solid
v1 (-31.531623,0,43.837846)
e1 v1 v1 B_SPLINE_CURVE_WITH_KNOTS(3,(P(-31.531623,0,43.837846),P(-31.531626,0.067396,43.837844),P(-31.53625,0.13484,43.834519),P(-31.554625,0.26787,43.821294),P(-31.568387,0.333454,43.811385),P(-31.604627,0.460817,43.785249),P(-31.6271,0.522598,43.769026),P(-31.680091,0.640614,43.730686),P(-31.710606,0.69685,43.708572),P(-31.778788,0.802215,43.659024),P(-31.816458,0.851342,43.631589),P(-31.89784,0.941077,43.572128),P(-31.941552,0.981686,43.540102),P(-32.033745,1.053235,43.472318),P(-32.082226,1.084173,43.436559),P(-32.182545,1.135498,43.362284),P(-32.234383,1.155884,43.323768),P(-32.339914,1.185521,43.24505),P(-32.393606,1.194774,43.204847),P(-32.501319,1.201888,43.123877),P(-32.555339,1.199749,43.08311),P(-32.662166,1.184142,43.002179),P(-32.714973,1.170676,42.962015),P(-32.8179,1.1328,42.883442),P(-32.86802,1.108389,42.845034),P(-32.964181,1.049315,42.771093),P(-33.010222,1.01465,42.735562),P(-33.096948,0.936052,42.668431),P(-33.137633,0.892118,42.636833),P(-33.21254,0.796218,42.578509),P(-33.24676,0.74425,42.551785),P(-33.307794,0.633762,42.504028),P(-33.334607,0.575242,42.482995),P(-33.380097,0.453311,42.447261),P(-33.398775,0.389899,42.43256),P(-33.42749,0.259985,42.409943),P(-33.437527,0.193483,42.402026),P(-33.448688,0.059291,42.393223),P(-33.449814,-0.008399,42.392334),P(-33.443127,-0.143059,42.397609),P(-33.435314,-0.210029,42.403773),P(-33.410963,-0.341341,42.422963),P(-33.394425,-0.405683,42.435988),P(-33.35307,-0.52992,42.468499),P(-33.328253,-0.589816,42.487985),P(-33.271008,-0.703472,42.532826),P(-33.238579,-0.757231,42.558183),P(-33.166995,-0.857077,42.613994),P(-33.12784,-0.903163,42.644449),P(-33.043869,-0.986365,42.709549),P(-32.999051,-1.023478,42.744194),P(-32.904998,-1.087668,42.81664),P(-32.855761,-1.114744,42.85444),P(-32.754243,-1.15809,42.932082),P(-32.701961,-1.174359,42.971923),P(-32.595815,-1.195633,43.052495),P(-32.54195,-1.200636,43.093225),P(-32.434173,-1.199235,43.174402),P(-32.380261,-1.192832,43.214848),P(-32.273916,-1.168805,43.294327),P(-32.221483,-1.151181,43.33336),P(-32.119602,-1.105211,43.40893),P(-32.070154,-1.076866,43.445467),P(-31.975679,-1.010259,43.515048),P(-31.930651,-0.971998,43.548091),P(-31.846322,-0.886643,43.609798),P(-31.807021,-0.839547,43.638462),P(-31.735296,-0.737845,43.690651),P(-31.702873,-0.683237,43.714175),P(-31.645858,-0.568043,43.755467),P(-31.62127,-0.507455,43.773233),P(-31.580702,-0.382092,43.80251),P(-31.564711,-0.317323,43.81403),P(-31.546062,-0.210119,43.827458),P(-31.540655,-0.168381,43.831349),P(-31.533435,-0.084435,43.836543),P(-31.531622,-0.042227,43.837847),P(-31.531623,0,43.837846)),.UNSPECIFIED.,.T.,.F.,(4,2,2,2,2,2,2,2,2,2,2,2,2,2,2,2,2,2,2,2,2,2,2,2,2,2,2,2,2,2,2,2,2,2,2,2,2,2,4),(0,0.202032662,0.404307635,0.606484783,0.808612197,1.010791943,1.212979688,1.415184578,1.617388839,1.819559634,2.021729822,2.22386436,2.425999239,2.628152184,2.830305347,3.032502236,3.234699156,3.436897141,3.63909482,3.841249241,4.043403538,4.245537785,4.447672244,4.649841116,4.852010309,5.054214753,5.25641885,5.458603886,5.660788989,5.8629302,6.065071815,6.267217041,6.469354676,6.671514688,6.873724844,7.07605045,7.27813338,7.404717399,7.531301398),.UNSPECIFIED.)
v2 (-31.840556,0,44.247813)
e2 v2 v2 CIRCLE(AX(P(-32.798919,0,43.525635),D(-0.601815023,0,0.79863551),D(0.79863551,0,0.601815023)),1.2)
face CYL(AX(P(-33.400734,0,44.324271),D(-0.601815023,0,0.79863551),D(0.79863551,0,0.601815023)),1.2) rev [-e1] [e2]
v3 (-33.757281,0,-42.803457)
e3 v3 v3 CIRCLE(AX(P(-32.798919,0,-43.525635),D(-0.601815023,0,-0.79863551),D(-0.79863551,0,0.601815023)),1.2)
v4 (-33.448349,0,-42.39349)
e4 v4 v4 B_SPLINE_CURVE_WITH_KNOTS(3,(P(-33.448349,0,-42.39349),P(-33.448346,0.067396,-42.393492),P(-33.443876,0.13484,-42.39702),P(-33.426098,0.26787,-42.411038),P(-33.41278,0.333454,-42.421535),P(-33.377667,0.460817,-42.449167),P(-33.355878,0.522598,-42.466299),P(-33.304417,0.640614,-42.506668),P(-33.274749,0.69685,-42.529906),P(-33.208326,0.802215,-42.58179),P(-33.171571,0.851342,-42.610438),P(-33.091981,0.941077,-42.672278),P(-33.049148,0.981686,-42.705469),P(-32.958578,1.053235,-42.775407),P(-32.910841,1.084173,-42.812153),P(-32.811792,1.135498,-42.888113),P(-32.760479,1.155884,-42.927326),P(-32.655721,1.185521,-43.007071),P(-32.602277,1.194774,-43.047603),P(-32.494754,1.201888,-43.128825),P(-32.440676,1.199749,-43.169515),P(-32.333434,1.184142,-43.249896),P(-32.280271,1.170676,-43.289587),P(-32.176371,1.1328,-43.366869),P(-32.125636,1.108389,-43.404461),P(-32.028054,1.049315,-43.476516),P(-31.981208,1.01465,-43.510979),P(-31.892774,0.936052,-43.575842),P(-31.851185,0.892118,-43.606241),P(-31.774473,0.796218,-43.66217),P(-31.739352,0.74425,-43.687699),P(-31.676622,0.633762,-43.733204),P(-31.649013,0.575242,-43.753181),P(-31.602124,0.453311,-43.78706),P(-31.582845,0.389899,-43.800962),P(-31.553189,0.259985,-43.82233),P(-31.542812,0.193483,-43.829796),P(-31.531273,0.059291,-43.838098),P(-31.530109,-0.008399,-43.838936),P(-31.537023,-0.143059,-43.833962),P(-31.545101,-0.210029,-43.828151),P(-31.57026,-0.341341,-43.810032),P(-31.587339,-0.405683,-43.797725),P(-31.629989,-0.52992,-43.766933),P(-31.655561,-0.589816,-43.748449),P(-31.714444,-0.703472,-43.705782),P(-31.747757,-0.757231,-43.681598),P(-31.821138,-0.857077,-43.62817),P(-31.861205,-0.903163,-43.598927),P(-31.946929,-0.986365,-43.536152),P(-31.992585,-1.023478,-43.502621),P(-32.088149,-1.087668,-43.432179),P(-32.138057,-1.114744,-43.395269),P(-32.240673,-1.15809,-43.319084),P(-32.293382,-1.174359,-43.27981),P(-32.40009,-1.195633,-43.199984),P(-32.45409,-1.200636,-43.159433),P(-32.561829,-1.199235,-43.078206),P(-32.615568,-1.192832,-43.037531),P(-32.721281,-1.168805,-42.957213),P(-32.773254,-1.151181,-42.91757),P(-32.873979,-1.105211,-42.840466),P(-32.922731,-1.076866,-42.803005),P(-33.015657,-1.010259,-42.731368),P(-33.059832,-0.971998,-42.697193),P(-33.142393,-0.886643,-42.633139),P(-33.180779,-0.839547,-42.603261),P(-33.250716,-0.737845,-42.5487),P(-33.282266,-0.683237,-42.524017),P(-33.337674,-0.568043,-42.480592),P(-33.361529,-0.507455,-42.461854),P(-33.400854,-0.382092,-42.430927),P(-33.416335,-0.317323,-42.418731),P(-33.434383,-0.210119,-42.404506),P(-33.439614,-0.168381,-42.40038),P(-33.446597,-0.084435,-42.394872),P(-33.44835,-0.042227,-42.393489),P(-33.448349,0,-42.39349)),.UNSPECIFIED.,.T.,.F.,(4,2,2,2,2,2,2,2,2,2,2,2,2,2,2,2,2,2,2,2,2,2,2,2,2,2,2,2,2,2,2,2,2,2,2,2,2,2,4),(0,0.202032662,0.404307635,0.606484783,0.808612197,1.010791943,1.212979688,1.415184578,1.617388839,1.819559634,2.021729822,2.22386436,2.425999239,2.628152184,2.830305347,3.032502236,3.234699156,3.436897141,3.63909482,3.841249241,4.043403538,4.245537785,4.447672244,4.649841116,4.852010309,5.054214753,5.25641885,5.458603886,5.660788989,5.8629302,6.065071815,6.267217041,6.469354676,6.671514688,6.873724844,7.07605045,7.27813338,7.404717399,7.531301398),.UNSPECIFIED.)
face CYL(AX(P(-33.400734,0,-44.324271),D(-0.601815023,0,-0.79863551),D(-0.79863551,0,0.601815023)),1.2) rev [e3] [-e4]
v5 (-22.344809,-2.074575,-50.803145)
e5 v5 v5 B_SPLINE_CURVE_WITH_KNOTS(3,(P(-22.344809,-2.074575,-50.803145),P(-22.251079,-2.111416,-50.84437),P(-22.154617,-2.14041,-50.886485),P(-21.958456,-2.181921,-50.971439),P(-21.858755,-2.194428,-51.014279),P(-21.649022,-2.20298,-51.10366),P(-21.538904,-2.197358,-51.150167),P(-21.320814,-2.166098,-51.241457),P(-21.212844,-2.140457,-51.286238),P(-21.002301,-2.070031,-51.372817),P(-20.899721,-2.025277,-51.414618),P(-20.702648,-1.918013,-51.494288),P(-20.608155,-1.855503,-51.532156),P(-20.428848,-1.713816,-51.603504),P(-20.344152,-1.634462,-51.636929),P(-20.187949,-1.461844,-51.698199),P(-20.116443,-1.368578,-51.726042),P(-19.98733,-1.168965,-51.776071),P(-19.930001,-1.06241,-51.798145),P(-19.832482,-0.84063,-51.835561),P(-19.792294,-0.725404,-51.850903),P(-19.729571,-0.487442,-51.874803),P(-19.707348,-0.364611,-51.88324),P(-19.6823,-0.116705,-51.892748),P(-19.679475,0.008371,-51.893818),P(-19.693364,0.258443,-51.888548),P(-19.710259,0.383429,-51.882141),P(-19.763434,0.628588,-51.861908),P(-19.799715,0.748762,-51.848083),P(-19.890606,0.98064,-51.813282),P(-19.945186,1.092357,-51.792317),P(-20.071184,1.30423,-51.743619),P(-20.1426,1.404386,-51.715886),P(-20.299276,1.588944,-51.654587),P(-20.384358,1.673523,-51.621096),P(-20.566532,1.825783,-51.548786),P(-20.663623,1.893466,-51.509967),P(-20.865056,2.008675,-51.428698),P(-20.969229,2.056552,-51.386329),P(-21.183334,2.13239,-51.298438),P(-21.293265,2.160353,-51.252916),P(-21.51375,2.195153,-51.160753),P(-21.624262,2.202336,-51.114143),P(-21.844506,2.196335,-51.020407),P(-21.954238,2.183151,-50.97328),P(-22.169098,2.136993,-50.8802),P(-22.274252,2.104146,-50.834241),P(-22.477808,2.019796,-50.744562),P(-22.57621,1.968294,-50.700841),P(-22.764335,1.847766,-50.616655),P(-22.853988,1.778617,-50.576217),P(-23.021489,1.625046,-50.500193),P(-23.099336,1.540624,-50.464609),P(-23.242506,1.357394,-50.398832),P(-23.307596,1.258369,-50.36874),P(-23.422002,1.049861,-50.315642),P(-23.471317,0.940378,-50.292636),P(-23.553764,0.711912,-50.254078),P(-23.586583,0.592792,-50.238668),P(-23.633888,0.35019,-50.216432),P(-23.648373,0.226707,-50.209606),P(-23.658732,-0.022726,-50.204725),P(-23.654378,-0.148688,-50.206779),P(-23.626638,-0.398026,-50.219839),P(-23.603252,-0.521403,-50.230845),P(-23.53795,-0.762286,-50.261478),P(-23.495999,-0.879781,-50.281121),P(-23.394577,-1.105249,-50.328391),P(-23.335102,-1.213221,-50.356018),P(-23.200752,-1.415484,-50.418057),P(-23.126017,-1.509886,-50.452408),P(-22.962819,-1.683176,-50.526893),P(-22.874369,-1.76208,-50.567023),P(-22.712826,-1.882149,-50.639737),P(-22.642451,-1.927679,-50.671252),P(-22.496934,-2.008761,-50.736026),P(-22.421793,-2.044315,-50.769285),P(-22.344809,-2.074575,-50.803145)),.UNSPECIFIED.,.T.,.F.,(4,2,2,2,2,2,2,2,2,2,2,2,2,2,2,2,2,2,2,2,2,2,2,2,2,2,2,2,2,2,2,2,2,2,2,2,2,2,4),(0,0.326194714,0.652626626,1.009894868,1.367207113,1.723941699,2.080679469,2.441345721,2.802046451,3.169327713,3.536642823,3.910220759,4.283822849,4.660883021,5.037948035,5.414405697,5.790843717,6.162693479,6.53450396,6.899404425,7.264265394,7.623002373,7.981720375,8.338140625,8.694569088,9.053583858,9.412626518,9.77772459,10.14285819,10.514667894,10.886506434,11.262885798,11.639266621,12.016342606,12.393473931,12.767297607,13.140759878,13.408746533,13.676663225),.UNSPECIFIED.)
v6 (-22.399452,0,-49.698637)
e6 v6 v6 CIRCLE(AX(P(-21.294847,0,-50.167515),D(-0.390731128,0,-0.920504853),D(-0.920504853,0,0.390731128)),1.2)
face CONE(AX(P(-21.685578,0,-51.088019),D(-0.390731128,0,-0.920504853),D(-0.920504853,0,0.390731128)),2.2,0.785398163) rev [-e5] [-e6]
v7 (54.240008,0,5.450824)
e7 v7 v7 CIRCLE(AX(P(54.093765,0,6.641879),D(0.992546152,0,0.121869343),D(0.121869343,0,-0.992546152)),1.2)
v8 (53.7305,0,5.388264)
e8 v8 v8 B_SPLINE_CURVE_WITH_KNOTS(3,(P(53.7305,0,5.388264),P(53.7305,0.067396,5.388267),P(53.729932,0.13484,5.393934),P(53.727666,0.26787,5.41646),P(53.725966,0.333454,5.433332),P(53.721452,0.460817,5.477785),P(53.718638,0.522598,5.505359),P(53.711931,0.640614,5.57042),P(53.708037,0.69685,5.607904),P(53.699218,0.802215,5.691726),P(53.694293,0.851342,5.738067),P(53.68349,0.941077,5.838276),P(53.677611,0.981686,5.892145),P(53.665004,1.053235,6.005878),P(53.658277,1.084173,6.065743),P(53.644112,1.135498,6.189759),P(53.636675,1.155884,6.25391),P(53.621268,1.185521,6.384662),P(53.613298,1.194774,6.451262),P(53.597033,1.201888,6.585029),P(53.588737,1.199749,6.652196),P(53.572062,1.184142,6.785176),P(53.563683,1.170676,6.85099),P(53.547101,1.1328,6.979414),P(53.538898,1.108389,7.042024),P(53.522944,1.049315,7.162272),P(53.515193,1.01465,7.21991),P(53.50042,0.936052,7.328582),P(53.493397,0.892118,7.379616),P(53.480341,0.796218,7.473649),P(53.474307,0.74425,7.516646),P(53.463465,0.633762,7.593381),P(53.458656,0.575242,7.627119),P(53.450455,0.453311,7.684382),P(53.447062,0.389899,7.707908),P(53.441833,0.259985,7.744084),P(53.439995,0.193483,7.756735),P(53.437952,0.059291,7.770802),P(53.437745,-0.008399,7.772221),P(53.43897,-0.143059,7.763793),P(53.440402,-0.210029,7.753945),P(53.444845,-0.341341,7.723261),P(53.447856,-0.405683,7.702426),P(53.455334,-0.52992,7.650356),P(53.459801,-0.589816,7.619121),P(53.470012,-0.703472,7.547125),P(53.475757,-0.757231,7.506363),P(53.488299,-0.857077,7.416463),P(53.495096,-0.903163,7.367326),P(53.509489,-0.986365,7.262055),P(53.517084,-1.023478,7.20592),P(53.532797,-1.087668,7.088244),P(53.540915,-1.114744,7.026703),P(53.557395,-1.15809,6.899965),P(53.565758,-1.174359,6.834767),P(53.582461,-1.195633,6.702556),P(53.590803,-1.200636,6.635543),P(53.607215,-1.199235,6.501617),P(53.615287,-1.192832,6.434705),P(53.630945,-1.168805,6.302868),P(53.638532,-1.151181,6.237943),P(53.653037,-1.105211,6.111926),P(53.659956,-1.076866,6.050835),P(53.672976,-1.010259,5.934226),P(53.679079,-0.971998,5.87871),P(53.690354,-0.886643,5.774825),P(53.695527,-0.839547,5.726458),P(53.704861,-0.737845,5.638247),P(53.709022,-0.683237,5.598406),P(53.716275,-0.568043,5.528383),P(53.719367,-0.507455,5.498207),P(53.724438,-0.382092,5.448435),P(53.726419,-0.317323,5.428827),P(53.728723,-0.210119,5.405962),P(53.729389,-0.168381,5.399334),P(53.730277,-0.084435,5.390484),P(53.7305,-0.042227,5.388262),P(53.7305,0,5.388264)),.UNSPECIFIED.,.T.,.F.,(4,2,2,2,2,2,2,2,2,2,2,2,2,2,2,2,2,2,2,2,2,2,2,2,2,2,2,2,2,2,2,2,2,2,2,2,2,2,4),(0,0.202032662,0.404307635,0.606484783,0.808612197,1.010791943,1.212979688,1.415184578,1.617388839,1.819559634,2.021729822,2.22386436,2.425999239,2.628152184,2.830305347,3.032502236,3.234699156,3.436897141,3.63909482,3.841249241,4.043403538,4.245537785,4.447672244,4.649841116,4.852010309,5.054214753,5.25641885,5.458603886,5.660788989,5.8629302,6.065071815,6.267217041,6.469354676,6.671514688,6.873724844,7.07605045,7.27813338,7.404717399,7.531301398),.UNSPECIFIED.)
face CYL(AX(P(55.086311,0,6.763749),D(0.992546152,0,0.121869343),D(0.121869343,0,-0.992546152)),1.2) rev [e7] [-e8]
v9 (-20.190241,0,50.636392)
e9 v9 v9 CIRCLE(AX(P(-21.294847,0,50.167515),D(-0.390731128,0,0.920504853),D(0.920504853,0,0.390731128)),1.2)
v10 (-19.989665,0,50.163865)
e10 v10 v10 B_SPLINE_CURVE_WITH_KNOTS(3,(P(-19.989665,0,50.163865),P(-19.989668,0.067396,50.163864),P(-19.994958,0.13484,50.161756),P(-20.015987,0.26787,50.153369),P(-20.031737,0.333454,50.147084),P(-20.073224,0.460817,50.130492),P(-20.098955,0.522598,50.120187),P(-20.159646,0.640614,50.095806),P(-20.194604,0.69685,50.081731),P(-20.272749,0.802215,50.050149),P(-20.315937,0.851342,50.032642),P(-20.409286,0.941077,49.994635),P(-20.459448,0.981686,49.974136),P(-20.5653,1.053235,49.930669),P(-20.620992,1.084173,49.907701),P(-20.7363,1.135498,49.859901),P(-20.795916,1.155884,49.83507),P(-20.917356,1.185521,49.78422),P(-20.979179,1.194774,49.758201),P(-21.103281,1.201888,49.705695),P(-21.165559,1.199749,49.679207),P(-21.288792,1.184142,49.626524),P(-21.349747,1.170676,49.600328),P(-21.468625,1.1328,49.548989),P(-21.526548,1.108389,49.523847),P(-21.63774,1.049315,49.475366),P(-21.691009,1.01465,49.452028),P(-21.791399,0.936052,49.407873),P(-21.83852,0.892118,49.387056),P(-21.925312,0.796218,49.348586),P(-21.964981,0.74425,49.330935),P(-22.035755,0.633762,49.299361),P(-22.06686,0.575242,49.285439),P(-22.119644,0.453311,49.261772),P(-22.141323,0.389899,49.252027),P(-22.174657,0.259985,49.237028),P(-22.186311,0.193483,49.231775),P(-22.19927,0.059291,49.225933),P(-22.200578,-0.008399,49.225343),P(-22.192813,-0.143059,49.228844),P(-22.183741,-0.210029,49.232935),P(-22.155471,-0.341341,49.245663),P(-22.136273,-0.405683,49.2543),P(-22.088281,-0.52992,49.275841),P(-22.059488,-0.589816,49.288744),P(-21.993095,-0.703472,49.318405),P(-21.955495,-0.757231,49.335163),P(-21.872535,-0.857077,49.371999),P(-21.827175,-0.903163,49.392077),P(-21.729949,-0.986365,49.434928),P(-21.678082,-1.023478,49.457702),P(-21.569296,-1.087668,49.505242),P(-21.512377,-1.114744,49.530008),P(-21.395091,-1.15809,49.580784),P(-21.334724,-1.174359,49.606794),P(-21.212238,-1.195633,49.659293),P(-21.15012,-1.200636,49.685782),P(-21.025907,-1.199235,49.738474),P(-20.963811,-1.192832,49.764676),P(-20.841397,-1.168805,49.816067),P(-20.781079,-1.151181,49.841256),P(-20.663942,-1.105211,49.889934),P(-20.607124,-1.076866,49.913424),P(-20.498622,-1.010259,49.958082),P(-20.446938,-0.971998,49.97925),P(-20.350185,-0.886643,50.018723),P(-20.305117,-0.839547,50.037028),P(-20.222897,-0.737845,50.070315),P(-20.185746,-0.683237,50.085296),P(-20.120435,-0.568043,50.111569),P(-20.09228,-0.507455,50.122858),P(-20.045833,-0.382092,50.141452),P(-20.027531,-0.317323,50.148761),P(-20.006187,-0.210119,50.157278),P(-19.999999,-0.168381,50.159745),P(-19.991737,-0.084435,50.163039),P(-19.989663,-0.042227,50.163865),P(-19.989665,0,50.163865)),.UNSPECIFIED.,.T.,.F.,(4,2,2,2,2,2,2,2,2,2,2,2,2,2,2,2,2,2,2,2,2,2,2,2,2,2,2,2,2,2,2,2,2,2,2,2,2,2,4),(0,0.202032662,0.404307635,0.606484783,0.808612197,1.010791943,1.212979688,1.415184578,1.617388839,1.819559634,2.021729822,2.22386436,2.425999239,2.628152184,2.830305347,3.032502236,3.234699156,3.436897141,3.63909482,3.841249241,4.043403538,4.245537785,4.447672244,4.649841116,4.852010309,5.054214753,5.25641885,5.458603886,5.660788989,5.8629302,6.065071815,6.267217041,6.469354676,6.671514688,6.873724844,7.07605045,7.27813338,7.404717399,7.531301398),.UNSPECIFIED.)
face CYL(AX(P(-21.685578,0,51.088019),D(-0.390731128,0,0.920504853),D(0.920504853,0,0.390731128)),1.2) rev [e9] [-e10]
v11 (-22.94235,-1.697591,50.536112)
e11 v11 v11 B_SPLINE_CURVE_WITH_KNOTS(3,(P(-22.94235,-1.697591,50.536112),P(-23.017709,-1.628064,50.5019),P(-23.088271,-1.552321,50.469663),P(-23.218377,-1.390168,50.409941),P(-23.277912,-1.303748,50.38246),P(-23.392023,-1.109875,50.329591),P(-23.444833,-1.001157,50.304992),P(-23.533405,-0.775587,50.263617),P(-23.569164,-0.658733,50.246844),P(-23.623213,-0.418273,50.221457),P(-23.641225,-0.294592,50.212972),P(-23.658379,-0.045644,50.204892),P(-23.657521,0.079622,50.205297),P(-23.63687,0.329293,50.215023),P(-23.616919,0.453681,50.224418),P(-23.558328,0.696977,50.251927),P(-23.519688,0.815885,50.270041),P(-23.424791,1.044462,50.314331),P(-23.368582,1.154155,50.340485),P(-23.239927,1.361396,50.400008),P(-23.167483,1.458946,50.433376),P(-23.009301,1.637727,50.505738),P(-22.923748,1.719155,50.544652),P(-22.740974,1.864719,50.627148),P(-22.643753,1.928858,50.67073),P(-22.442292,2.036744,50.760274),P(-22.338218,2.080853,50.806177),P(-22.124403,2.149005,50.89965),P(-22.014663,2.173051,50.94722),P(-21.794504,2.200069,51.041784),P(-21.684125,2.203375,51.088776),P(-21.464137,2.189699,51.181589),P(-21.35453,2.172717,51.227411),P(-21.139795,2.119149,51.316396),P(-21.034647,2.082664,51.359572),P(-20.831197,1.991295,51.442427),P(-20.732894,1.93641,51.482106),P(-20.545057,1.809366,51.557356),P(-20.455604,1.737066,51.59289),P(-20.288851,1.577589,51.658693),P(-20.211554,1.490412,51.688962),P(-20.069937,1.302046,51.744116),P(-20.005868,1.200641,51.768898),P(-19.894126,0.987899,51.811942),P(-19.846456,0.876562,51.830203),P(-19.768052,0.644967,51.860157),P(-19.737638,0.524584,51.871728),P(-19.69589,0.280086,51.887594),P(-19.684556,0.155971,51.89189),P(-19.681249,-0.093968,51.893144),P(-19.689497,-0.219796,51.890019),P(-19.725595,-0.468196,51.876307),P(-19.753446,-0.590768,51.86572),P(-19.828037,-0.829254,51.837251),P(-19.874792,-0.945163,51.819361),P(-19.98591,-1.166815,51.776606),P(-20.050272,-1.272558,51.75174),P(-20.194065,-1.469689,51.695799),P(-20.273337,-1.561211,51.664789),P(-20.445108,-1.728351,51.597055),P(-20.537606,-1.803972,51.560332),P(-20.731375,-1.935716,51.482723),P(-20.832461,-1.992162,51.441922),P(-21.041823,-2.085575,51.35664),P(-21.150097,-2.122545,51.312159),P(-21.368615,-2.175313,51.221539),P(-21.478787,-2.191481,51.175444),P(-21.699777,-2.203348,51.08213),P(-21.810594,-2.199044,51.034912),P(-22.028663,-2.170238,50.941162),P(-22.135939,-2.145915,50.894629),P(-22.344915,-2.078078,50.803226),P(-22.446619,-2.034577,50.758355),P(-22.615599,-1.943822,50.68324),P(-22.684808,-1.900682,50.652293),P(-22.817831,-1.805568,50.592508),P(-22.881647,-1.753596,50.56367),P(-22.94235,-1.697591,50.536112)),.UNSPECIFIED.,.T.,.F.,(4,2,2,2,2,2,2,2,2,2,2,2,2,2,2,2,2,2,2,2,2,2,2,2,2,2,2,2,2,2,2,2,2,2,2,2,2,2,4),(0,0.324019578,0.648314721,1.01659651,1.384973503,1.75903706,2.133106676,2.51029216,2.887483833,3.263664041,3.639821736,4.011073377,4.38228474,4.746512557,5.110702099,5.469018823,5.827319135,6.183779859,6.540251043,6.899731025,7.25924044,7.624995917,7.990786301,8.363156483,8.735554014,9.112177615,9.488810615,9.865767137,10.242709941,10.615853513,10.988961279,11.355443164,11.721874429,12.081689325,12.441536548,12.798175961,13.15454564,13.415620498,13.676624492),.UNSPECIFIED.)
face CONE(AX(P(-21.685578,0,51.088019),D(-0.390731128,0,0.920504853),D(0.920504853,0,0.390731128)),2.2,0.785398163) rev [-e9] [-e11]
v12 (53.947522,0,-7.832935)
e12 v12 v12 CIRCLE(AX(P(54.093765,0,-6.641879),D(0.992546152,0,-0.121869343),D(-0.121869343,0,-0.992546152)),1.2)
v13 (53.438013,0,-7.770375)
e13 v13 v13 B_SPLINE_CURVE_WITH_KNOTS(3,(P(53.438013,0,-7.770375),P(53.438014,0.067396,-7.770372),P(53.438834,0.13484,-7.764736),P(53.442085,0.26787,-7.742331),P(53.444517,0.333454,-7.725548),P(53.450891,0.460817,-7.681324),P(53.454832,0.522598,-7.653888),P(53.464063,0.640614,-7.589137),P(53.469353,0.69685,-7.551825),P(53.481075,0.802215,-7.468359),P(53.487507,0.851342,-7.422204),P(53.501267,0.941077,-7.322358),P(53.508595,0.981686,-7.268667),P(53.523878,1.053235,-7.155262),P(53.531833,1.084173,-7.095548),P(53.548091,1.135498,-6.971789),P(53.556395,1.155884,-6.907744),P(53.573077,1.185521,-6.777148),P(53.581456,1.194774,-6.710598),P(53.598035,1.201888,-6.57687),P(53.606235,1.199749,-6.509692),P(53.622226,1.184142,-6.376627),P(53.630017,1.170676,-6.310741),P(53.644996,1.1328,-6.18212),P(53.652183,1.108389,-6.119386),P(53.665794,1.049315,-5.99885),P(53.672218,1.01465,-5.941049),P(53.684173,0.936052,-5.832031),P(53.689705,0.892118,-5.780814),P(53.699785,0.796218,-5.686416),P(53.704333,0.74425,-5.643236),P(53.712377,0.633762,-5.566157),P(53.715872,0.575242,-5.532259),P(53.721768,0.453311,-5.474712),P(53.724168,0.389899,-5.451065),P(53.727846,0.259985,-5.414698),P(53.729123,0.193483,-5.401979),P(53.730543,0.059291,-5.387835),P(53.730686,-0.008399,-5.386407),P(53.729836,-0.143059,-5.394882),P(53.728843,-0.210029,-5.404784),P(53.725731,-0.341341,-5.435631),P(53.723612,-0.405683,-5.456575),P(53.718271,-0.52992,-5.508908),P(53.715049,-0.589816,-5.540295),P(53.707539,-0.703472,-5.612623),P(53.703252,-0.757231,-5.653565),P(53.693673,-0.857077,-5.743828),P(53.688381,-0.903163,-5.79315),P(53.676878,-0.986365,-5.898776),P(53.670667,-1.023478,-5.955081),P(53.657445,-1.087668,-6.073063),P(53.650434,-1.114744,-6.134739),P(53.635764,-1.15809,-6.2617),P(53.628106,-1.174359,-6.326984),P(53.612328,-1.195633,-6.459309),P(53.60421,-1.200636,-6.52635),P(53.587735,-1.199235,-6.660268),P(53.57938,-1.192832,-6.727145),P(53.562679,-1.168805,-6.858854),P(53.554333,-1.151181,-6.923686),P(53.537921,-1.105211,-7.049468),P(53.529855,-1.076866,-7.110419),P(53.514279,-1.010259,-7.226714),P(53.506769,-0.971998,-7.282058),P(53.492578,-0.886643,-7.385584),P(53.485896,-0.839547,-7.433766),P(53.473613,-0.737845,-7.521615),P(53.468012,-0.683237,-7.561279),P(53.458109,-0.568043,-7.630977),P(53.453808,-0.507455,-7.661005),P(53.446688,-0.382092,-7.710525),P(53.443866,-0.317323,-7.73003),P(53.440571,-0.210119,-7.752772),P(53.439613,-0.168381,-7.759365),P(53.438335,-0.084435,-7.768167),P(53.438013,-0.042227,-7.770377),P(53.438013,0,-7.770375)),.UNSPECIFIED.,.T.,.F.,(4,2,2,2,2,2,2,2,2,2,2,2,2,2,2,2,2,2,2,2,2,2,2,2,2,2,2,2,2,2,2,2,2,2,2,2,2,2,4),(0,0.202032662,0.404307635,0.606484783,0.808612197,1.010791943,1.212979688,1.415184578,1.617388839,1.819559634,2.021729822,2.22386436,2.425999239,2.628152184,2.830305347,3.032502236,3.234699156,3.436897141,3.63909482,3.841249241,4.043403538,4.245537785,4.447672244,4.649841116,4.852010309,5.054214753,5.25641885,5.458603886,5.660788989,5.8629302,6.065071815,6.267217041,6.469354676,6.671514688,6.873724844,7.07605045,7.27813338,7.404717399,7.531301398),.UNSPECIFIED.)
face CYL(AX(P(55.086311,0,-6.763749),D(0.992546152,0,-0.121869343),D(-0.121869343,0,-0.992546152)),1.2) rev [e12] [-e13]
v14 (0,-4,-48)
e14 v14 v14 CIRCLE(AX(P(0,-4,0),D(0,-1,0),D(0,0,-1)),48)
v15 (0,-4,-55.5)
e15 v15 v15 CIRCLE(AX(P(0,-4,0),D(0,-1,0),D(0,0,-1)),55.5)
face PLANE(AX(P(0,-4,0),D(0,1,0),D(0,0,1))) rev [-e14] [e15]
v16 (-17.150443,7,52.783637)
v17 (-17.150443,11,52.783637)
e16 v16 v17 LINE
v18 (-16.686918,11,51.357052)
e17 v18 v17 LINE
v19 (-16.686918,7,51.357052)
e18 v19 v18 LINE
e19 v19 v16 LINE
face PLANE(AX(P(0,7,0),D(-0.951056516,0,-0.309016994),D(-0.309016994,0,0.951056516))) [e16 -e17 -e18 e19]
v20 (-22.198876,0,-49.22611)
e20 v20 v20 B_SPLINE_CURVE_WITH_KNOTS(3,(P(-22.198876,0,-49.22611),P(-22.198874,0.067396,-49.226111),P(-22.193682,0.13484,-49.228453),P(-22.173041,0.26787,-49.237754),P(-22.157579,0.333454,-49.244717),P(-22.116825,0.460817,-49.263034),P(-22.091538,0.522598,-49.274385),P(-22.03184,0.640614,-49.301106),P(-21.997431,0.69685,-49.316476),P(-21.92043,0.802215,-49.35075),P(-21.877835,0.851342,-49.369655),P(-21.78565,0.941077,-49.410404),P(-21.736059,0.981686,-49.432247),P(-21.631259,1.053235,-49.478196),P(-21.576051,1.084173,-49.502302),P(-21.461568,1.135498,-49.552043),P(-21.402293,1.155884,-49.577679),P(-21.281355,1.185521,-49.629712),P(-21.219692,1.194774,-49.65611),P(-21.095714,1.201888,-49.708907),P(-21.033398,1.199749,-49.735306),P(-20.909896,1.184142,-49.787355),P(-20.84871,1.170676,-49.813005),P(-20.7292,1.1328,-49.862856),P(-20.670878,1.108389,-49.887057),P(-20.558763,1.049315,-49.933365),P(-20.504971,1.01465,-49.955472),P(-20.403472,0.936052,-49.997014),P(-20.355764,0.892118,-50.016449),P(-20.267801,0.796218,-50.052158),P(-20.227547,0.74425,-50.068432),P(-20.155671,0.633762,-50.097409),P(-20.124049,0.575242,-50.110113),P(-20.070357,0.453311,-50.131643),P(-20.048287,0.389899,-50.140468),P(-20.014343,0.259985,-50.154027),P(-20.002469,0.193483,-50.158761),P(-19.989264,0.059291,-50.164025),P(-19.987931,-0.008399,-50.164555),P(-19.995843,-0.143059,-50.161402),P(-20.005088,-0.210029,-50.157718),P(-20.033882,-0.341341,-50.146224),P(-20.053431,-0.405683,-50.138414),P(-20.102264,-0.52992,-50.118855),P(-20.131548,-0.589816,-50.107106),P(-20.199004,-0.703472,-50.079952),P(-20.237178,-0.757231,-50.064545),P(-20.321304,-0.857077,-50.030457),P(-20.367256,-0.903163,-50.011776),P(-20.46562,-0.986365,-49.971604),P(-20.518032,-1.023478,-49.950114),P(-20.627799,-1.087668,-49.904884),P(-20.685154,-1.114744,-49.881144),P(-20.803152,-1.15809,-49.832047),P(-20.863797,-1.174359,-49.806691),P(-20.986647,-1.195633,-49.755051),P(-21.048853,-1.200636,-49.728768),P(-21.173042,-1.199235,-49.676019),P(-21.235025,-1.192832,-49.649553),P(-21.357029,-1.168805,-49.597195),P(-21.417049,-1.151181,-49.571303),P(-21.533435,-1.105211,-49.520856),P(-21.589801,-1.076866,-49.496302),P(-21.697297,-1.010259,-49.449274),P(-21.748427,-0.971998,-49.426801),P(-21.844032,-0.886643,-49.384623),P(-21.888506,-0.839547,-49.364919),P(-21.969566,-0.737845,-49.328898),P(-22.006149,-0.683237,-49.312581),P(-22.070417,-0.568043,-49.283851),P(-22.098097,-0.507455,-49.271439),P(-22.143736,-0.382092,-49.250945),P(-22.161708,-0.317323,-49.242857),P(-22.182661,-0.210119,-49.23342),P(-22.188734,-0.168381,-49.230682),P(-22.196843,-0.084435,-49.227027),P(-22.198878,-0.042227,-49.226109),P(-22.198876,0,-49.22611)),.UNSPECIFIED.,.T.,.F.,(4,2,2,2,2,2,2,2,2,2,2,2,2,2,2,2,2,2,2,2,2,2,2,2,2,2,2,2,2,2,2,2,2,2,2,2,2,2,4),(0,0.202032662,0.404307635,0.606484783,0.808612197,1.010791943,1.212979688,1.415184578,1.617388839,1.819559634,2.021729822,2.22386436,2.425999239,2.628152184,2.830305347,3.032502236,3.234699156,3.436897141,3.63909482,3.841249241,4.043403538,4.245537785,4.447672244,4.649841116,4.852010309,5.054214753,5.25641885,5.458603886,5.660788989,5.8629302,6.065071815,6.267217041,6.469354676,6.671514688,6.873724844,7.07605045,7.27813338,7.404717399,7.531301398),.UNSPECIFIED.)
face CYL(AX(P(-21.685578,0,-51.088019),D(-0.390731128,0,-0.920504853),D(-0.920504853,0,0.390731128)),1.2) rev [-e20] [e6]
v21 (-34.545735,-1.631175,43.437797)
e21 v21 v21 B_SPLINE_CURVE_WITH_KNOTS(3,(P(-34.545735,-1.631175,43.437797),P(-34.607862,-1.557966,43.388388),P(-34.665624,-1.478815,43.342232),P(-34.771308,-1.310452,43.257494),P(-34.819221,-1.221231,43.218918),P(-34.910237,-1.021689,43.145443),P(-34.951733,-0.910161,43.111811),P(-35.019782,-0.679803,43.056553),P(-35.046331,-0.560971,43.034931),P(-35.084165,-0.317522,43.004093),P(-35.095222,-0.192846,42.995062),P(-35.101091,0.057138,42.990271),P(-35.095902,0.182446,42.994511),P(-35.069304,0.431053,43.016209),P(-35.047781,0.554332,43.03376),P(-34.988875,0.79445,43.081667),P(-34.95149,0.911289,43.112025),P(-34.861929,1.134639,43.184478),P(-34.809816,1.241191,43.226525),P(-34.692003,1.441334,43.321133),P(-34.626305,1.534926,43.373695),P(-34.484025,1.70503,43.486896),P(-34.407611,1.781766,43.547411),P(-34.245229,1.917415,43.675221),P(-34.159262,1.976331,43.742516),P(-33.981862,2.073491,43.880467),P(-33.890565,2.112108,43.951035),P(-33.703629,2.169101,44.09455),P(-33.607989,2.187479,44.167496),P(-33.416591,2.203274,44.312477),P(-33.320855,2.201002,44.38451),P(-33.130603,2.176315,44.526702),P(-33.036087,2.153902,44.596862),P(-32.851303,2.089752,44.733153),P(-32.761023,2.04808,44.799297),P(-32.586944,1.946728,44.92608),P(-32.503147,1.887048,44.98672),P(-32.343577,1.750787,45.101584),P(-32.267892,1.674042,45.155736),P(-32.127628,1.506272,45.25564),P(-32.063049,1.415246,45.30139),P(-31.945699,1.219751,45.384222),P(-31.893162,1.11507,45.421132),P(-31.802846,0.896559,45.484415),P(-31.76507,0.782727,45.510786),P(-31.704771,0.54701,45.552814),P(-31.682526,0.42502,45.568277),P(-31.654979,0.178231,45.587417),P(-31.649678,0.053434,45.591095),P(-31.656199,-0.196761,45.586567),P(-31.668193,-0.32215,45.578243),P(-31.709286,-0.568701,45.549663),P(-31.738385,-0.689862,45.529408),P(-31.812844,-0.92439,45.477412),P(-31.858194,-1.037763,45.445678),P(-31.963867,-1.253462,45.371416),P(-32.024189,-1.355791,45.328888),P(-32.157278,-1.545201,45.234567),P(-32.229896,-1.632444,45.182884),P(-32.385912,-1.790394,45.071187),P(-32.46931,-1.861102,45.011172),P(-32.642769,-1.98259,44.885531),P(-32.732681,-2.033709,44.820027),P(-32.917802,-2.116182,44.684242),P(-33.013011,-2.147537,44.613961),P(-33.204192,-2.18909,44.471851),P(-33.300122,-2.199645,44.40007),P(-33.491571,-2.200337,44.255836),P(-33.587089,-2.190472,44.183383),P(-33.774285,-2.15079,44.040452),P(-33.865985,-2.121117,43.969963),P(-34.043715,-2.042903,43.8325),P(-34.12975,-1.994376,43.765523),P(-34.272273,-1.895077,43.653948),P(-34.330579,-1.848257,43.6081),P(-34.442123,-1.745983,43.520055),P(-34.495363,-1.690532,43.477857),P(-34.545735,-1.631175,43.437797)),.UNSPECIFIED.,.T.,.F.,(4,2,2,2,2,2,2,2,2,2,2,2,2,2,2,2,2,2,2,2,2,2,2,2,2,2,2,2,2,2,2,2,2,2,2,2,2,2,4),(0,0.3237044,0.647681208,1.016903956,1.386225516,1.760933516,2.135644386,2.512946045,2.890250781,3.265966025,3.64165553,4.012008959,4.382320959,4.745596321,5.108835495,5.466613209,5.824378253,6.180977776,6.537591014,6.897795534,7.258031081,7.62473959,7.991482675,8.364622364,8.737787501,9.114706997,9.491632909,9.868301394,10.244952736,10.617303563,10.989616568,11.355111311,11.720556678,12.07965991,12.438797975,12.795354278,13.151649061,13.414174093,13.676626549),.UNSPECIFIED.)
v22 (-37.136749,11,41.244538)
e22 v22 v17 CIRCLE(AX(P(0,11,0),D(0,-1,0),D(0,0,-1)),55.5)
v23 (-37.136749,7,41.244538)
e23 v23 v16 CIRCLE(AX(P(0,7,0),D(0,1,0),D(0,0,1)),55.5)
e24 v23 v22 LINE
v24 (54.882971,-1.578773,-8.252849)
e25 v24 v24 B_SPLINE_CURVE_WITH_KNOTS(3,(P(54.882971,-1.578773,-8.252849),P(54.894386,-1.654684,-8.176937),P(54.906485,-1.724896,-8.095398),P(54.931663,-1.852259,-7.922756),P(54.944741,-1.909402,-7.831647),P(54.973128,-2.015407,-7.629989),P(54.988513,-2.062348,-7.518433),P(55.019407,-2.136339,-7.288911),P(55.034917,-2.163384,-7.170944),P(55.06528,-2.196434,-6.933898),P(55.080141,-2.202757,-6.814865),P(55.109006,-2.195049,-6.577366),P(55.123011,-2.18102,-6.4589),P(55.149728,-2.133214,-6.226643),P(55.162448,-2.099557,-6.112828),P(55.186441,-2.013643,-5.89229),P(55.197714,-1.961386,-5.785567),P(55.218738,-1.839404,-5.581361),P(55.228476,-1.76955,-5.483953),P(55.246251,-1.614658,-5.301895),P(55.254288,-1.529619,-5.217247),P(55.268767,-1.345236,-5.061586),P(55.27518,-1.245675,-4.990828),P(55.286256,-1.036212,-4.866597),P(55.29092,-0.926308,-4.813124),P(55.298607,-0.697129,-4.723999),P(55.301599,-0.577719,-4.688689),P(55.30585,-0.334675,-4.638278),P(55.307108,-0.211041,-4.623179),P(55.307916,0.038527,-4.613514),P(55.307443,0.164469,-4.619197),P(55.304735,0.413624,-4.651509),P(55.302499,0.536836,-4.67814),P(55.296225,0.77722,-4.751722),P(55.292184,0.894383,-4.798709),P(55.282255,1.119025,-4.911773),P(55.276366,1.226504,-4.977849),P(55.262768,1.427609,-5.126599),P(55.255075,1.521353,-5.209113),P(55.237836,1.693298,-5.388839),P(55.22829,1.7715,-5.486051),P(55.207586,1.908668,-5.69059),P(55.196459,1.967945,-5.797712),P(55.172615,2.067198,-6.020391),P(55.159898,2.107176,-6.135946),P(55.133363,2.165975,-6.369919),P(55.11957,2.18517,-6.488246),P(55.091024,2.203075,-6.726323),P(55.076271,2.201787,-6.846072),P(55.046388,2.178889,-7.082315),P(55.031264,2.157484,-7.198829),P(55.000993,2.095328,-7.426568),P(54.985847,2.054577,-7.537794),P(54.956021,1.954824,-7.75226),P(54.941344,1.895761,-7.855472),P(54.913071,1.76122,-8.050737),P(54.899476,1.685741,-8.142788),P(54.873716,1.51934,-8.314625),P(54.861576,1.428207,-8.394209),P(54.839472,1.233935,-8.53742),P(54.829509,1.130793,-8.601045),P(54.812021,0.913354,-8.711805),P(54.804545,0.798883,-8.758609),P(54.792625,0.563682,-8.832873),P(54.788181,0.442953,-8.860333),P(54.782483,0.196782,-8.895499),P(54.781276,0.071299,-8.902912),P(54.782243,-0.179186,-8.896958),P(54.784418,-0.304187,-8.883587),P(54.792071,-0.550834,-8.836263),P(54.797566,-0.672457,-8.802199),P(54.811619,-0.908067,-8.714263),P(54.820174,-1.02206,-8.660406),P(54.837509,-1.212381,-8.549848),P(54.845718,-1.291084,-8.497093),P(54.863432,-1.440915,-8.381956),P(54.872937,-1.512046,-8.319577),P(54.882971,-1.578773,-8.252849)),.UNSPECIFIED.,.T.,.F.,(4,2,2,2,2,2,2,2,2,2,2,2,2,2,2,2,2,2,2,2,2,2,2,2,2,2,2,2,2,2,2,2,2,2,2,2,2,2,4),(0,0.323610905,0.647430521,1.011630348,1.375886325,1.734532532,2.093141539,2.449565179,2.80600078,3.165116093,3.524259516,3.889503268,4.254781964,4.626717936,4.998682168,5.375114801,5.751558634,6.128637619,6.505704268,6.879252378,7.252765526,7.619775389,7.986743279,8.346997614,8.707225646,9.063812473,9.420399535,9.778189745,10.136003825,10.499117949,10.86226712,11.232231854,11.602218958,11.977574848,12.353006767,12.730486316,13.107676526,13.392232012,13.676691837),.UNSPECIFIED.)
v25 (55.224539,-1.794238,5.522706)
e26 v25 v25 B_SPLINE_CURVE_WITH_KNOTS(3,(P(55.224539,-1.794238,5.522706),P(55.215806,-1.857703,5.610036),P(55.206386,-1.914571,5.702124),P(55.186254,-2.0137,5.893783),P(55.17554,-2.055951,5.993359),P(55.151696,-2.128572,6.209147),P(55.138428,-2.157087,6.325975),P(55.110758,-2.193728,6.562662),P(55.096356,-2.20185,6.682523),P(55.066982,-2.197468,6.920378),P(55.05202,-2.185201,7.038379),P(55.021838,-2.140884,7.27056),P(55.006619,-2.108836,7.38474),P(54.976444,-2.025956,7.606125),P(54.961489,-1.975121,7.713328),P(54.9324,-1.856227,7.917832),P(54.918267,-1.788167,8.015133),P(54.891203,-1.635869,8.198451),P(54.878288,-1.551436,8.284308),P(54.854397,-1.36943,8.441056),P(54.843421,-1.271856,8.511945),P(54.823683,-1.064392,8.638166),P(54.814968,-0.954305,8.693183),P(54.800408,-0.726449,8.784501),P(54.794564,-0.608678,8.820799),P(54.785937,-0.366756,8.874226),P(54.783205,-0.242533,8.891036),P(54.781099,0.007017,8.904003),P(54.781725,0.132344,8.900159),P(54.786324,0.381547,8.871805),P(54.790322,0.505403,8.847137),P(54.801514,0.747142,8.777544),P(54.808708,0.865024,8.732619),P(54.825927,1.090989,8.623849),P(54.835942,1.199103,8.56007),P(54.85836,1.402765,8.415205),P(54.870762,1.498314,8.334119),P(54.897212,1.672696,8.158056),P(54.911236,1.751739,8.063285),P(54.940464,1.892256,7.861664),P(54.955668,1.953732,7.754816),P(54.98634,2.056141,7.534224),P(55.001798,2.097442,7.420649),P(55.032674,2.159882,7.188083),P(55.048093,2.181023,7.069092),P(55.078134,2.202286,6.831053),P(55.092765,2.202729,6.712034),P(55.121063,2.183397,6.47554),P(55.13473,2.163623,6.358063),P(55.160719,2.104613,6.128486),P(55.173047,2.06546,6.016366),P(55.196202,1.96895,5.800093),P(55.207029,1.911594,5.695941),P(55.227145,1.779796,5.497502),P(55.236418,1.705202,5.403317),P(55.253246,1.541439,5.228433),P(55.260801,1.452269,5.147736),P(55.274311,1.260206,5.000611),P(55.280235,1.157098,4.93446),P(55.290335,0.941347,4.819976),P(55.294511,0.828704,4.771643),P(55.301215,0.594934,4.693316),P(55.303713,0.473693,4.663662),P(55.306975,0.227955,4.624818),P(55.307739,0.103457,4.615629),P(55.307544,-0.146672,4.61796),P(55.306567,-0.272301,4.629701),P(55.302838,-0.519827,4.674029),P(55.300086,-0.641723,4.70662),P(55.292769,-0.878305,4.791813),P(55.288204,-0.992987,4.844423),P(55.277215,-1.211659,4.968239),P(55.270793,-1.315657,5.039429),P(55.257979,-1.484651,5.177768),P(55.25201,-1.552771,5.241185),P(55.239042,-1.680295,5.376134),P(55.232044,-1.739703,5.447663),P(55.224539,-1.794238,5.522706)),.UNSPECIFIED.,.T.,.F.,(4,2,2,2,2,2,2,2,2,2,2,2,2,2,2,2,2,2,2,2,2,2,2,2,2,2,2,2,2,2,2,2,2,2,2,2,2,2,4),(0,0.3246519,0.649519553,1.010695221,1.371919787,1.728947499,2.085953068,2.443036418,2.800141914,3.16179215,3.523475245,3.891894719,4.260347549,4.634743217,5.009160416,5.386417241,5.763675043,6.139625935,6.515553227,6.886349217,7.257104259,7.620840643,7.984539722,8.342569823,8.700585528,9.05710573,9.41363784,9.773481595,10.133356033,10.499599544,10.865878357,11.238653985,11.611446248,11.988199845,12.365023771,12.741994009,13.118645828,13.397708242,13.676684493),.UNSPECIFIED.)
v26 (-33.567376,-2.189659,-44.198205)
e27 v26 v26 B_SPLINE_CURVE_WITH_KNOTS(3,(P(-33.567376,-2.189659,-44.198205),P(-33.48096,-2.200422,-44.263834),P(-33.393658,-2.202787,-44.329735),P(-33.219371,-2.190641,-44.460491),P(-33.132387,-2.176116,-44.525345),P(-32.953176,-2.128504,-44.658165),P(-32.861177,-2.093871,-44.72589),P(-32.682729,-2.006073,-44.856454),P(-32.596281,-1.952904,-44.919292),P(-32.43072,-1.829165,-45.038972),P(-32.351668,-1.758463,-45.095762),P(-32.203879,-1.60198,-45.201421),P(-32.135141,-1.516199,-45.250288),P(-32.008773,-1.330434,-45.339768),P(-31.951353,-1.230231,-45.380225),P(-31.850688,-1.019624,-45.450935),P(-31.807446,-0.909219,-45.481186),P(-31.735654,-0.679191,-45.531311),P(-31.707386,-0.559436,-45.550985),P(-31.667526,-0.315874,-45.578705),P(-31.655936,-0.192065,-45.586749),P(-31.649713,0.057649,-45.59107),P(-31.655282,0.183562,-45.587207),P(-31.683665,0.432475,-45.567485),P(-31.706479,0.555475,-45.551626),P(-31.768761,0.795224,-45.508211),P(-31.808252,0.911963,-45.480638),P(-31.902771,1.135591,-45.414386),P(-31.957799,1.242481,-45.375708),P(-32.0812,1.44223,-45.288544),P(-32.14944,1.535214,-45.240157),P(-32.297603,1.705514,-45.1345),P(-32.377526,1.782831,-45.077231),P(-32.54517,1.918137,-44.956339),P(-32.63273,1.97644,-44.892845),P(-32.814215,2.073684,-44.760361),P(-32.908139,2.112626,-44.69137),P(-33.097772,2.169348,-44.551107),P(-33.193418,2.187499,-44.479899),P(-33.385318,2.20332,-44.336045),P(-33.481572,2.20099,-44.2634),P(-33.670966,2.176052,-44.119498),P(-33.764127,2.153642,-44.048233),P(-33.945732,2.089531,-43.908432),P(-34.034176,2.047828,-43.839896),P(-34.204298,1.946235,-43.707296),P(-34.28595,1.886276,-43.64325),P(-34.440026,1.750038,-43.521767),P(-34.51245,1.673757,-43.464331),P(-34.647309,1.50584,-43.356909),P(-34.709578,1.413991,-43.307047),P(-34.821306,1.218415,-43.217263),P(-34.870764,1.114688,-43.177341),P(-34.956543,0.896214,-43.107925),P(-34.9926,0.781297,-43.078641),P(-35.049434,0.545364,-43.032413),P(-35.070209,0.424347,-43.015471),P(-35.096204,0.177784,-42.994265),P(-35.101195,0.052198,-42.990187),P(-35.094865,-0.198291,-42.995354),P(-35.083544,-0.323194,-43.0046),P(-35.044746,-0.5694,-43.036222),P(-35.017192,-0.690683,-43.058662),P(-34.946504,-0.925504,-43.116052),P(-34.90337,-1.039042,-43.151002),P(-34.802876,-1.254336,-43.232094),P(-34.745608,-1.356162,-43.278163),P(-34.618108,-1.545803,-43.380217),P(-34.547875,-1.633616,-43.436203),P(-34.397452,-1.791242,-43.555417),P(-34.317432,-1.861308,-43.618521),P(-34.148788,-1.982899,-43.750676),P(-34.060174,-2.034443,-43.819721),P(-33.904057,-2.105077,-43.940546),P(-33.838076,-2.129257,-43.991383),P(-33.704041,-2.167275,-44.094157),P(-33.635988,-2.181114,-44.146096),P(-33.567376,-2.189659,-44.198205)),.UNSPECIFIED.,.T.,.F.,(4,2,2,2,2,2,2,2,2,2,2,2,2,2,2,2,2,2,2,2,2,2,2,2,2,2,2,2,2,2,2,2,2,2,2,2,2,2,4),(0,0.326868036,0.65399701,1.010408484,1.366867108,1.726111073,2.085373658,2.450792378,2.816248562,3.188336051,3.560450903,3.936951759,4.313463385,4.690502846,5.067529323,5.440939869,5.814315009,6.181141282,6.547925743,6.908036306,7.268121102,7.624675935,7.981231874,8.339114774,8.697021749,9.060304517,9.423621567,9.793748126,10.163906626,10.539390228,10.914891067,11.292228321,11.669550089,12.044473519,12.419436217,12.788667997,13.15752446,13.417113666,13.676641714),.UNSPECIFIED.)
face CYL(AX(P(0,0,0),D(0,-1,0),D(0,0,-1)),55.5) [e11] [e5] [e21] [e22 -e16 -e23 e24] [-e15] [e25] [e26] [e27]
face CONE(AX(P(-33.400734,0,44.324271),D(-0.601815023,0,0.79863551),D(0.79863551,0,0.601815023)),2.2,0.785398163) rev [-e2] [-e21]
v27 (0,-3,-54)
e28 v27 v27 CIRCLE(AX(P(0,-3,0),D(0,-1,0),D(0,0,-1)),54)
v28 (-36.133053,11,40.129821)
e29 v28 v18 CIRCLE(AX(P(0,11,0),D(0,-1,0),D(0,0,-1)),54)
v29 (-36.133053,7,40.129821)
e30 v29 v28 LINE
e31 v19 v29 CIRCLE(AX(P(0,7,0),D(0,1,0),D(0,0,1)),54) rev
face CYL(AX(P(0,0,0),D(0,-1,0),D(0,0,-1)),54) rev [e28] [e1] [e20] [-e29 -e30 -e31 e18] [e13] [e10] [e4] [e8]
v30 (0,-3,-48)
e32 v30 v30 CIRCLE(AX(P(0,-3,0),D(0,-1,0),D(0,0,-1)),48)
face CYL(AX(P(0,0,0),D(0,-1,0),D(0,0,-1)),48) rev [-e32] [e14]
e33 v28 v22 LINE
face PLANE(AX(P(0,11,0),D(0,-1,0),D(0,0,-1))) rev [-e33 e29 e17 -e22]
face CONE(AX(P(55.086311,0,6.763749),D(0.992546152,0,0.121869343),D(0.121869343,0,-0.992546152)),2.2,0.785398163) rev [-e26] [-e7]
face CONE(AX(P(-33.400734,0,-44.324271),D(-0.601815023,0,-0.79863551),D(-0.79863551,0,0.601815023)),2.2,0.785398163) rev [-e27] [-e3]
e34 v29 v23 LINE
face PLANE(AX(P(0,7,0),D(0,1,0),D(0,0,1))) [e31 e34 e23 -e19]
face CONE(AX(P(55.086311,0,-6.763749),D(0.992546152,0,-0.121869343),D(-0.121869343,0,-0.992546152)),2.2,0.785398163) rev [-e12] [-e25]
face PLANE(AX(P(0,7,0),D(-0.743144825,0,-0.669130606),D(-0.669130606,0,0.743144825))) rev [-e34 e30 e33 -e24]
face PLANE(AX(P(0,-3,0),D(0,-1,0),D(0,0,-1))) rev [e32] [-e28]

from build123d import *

# Parameters (mm, degrees)
CUT_EXTRUDE2_DEPTH = 4


# Read off the part's stored shape, not the designer's step: CSK for M2 Flat Head Machine Screw1
with BuildPart() as part:
    # Sketch1 → Revolve1 (revolve)
    with BuildSketch(Plane.XY, mode=Mode.PRIVATE) as revolve1_sk:
        Polygon((54, 11), (55.5, 11), (55.5, -4), (48, -4), (48, -3), (54, -3), align=None)
    revolve(revolve1_sk.sketch.rotate(Axis((0, 0, 0), (0, 1, 0)), 90), axis=Axis((0, 0, 0), (0, 1, 0)))

    # Sketch7 → Cut-Extrude2 (cut)
    with BuildSketch(Plane(origin=(0, 11, 0), x_dir=(1, 0, 0), z_dir=(0, 1, 0))):
        with BuildLine():
            Line((-17.150443188, -52.783636654), (-16.686917696, -51.35705188))
            ThreePointArc((-16.686917696, -51.35705188), (-27, -46.765371804), (-36.133052743, -40.129820576))
            Line((-36.133052743, -40.129820576), (-37.136748653, -41.244537814))
            ThreePointArc((-37.136748653, -41.244537814), (-27.75, -48.06440991), (-17.150443188, -52.783636654))
        make_face()
    extrude(amount=-CUT_EXTRUDE2_DEPTH, mode=Mode.SUBTRACT)

    # CSK for M2 Flat Head Machine Screw1 outl → CSK for M2 Flat Head Machine Screw1 (revolve, cut)
    with BuildSketch(Plane(origin=(0, 0, 0), x_dir=(0, 1, 0), z_dir=(-0.121869343405148, 0, -0.992546151641322))):
        Polygon((2.200019656, 55.500019656), (0, 55.500019656), (0, 53.986657854), (1.2, 53.986657854), (1.2, 54.5), align=None)
    revolve(axis=Axis((0, 0, 0), (0.992546151641322, 0, -0.121869343405148)), mode=Mode.SUBTRACT)

    # CSK for M2 Flat Head Machine Screw1 2 ou → CSK for M2 Flat Head Machine Screw1 2 (revolve, cut)
    with BuildSketch(Plane(origin=(0, 0, 0), x_dir=(0, 1, 0), z_dir=(0.12186934340514702, 0, -0.9925461516413221))):
        Polygon((2.200023885, 55.500023885), (0, 55.500023885), (0, 53.986657854), (1.2, 53.986657854), (1.2, 54.5), align=None)
    revolve(axis=Axis((0, 0, 0), (0.9925461516413221, 0, 0.12186934340514702)), mode=Mode.SUBTRACT)

    # CSK for M2 Flat Head Machine Screw1 3 ou → CSK for M2 Flat Head Machine Screw1 3 (revolve, cut)
    with BuildSketch(Plane(origin=(0, 0, 0), x_dir=(0.9205048534524387, 0, -0.3907311284892778), z_dir=(0, -1, 0))):
        Polygon((0, -55.500018568), (2.200018568, -55.500018568), (1.2, -54.5), (1.2, -53.986657854), (0, -53.986657854), align=None)
    revolve(axis=Axis((0, 0, 0), (0.3907311284892778, 0, 0.9205048534524387)), mode=Mode.SUBTRACT)

    # CSK for M2 Flat Head Machine Screw1 4 ou → CSK for M2 Flat Head Machine Screw1 4 (revolve, cut)
    with BuildSketch(Plane(origin=(0, 0, 0), x_dir=(0.79863551004729, 0, -0.601815023152052), z_dir=(0, -1, 0))):
        Polygon((0, -55.500012206), (2.200012206, -55.500012206), (1.2, -54.5), (1.2, -53.986657854), (0, -53.986657854), align=None)
    revolve(axis=Axis((0, 0, 0), (0.601815023152052, 0, 0.79863551004729)), mode=Mode.SUBTRACT)

    # CSK for M2 Flat Head Machine Screw1 5 ou → CSK for M2 Flat Head Machine Screw1 5 (revolve, cut)
    with BuildSketch(Plane(origin=(0, 0, 0), x_dir=(0.9205048534524416, 0, 0.39073112848927083), z_dir=(0, 1, 0))):
        Polygon((0, -55.500018348), (2.200018348, -55.500018348), (1.2, -54.5), (1.2, -53.986657854), (0, -53.986657854), align=None)
    revolve(axis=Axis((0, 0, 0), (0.39073112848927083, 0, -0.9205048534524416)), mode=Mode.SUBTRACT)

    # CSK for M2 Flat Head Machine Screw1 6 ou → CSK for M2 Flat Head Machine Screw1 6 (revolve, cut)
    with BuildSketch(Plane(origin=(0, 0, 0), x_dir=(0.7986355100472992, 0, 0.60181502315204), z_dir=(0, 1, 0))):
        Polygon((0, -55.50002414), (2.20002414, -55.50002414), (1.2, -54.5), (1.2, -53.986657854), (0, -53.986657854), align=None)
    revolve(axis=Axis((0, 0, 0), (0.60181502315204, 0, -0.7986355100472992)), mode=Mode.SUBTRACT)


solid = part.part
